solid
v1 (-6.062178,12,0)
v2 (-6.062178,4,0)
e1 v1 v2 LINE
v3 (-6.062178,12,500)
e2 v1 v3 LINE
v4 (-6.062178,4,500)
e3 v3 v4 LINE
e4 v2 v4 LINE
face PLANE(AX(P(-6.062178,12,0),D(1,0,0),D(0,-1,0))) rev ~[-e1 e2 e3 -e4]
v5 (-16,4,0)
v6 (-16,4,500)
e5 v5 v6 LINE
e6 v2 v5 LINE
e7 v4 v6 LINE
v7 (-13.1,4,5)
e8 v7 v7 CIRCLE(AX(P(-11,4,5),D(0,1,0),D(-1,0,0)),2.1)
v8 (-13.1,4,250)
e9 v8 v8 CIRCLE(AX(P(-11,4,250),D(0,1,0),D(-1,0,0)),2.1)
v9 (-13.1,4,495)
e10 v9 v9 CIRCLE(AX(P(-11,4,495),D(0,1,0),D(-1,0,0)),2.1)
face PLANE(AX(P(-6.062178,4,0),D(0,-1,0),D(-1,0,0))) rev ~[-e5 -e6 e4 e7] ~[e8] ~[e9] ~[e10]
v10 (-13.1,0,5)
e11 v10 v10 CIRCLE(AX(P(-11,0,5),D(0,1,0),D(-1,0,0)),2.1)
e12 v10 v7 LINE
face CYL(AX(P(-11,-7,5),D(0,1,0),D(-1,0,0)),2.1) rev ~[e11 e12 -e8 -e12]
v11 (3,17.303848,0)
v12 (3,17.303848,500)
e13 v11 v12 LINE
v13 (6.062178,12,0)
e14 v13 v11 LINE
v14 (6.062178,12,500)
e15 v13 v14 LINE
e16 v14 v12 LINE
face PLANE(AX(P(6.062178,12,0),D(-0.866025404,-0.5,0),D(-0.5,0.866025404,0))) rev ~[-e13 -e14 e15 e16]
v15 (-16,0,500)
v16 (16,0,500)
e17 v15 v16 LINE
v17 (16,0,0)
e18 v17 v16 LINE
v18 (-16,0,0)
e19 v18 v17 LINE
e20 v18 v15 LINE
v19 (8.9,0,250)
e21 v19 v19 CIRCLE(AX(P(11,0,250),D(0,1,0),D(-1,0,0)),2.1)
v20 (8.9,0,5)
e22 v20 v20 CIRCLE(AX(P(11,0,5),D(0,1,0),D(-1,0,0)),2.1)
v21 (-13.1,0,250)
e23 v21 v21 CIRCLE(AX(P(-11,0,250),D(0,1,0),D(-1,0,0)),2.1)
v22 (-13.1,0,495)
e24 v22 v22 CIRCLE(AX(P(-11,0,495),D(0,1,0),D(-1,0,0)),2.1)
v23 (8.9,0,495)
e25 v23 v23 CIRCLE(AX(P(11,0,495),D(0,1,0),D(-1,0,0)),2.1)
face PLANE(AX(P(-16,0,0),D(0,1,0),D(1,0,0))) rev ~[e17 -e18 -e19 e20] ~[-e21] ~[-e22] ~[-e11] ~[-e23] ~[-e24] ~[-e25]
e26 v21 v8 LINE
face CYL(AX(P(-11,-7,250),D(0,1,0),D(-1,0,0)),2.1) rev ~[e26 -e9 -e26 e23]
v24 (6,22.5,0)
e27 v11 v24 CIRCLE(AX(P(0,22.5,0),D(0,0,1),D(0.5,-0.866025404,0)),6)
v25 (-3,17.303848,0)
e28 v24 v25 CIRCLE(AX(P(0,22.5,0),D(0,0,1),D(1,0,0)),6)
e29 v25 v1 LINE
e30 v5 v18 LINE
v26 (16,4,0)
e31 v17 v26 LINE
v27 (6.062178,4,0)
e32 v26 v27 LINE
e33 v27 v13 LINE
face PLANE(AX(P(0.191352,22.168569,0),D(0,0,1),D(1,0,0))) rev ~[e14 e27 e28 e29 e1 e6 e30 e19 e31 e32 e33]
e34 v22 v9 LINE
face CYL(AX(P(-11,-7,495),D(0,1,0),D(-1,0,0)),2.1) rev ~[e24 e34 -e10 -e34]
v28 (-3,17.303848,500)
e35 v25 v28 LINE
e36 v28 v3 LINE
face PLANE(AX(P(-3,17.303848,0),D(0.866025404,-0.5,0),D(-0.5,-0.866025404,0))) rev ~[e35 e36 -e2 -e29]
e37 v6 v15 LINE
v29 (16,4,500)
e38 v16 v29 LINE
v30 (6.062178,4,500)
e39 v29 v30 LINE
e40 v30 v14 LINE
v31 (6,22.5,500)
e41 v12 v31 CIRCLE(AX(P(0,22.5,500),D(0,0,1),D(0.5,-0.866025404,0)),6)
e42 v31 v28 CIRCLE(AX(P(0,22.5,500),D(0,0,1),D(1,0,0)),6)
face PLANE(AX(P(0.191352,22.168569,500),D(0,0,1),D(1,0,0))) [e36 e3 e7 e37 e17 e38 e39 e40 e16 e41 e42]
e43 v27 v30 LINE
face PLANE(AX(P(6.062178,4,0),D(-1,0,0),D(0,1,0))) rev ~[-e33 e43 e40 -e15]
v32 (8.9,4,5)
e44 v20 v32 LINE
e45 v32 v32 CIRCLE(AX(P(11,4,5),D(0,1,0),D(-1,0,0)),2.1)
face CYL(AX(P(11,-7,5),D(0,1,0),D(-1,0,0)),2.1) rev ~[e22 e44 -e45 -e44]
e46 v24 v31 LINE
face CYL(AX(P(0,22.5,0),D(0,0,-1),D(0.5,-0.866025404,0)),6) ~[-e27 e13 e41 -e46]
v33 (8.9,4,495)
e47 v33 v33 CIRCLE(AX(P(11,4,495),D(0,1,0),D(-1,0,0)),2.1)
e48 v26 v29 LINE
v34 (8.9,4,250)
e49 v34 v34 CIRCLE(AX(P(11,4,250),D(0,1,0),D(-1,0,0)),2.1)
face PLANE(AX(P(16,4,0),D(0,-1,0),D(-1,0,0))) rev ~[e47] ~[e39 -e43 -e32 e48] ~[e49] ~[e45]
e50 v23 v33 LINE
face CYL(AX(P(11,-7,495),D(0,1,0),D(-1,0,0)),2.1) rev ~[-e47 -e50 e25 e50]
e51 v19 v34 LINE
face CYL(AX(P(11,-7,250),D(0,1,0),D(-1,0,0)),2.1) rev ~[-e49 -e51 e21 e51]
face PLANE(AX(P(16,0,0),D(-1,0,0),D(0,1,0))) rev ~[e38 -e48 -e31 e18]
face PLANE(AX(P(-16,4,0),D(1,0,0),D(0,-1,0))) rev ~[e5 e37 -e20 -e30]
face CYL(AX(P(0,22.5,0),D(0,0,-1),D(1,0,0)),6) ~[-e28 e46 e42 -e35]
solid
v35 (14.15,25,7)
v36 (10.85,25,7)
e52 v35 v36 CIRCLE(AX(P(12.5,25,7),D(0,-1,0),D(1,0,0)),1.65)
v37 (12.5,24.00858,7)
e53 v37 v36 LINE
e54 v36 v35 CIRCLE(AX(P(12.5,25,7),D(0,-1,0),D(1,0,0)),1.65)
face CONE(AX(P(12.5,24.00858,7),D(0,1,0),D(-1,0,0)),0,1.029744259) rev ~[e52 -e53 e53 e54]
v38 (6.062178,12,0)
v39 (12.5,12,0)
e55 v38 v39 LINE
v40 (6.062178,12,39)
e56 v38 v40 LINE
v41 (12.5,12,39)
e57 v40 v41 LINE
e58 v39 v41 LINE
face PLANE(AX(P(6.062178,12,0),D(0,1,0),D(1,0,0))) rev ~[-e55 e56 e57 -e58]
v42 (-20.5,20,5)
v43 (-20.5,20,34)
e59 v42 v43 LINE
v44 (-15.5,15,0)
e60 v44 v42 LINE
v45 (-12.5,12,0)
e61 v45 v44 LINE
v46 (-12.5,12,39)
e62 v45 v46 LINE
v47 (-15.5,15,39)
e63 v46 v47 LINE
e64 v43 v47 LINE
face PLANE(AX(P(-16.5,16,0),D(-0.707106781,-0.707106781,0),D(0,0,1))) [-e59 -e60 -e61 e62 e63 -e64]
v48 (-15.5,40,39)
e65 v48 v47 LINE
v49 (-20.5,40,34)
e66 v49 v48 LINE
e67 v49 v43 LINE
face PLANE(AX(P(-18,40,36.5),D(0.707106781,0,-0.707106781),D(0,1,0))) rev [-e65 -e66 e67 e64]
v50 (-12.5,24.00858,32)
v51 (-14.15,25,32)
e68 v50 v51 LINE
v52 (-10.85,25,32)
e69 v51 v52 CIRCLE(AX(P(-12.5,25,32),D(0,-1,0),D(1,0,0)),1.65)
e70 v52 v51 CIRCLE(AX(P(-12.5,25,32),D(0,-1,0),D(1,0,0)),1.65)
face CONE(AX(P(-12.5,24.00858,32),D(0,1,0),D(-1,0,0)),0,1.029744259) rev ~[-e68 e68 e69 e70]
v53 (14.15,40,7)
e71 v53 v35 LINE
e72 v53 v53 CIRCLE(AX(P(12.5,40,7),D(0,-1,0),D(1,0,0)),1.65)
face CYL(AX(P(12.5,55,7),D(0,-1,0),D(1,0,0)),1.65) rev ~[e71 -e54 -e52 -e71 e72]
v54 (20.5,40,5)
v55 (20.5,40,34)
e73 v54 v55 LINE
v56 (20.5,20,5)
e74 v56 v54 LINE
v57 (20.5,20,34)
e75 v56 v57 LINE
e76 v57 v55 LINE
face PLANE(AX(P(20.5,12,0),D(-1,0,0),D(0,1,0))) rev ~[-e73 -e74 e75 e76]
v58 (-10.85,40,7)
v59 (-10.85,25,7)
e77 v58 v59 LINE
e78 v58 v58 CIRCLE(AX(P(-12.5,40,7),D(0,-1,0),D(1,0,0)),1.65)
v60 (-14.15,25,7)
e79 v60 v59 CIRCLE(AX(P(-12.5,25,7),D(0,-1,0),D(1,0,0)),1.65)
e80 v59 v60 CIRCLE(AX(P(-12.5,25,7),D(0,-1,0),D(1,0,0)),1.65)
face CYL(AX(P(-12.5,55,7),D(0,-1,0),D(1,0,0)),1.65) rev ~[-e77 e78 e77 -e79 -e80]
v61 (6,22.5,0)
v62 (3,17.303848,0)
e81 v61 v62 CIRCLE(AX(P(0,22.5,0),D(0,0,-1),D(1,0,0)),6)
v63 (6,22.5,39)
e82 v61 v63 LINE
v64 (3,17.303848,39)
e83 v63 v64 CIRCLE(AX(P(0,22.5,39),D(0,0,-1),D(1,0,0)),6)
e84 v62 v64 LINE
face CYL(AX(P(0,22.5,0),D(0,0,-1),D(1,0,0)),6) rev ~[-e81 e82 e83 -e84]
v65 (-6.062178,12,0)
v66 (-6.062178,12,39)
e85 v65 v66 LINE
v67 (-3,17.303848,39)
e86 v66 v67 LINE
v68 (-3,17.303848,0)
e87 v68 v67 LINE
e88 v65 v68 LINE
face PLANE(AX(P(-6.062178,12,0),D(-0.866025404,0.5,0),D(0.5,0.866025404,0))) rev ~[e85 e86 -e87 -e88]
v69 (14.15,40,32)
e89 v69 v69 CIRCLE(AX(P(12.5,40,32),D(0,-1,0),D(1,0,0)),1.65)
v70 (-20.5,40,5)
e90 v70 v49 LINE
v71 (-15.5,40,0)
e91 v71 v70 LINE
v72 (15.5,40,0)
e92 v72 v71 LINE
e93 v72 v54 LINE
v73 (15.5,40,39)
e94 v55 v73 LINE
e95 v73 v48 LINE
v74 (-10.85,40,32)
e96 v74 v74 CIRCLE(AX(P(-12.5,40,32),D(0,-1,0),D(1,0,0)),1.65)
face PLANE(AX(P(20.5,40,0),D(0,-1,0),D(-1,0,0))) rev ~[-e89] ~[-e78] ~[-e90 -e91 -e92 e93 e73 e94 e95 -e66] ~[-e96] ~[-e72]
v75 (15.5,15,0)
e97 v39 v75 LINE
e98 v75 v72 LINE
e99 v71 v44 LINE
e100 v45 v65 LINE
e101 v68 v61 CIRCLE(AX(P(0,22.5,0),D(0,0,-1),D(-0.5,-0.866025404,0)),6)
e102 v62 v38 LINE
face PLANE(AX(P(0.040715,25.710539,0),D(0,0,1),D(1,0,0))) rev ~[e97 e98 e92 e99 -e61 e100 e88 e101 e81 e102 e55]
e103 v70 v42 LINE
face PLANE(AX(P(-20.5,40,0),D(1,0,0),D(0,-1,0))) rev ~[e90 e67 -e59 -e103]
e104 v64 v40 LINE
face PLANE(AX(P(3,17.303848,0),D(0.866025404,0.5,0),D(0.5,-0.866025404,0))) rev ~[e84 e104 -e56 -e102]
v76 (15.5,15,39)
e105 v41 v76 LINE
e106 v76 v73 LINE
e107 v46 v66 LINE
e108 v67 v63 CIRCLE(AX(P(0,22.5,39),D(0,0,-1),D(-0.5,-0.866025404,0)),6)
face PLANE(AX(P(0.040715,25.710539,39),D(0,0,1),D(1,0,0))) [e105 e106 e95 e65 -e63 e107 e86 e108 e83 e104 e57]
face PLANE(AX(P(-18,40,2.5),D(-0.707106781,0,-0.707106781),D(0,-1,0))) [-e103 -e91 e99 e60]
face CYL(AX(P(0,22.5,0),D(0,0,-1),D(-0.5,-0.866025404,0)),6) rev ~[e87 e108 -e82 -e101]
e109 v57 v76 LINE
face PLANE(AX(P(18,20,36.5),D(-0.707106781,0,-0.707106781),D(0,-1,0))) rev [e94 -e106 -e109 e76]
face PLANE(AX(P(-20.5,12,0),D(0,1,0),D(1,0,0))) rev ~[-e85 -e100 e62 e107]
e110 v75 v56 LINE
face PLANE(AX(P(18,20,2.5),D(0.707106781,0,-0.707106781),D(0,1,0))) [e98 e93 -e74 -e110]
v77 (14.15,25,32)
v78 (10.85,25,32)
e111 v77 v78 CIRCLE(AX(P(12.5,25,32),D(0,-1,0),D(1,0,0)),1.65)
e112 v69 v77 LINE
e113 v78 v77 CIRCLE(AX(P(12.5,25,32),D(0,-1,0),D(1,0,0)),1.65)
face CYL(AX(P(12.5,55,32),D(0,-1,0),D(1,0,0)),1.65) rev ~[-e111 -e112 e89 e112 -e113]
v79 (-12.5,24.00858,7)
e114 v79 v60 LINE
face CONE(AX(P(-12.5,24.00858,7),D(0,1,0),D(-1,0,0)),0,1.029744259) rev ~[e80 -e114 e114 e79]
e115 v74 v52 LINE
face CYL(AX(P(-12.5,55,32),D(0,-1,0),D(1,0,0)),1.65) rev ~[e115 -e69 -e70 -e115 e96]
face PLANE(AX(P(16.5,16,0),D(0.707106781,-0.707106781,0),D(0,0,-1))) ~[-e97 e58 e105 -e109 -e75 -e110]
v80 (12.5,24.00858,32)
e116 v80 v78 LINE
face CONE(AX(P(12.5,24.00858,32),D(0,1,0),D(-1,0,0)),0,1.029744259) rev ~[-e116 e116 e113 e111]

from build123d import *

# Parameters (mm, degrees)
F1_DEPTH = 500
F2_DEPTH = 39
F4_D     = 3.3
F4_DEPTH = 15
F4_TIP   = 0.9914200214
F5_SIZE  = 8
F6_SIZE  = 5
F8_D     = 4.2
F8_DEPTH = 7
F8_TIP   = 1.2618073


with BuildPart() as f1:
    # F0 (on Top) → F1 (new body)
    with BuildSketch(Plane.XY):
        with BuildLine():
            ThreePointArc((3, 17.3038475773), (5.1961524227, 19.5), (6, 22.5))
            ThreePointArc((6, 22.5), (-3, 27.6961524227), (-3, 17.3038475773))
            ThreePointArc((-3, 17.3038475773), (0, 16.5), (3, 17.3038475773))
        make_face()
        with BuildLine():
            ThreePointArc((3, 17.3038475773), (0, 16.5), (-3, 17.3038475773))
            Line((-3, 17.3038475773), (-6.0621778265, 12))
            Line((-6.0621778265, 12), (-6.0621778265, 4))
            Line((-6.0621778265, 4), (6.0621778265, 4))
            Line((6.0621778265, 4), (6.0621778265, 12))
            Line((6.0621778265, 12), (3, 17.3038475773))
        make_face()
        Polygon((6.0621778265, 4), (-6.0621778265, 4), (-16, 4), (-16, 0), (16, 0), (16, 4), align=None)
    extrude(amount=F1_DEPTH)

    # F8
    with Locations(Plane.XZ):
        with Locations((11, 5), (-11, 5), (11, 250), (-11, 250), (11, 495), (-11, 495)):
            Hole(F8_D / 2, depth=F8_DEPTH)
            with Locations((0, 0, -(F8_DEPTH + F8_TIP / 2))):  # 118° drill point
                Cone(0, F8_D / 2, F8_TIP, mode=Mode.SUBTRACT)


with BuildPart() as f2:
    # F0 (on Top) → F2 (new body)
    with BuildSketch(Plane.XY):
        with BuildLine():
            ThreePointArc((-3, 17.3038475773), (-3, 27.6961524227), (6, 22.5))
            ThreePointArc((6, 22.5), (5.1961524227, 19.5), (3, 17.3038475773))
            Line((3, 17.3038475773), (6.0621778265, 12))
            Line((6.0621778265, 12), (20.5, 12))
            Line((20.5, 12), (20.5, 40))
            Line((20.5, 40), (-20.5, 40))
            Line((-20.5, 40), (-20.5, 12))
            Line((-20.5, 12), (-6.0621778265, 12))
            Line((-6.0621778265, 12), (-3, 17.3038475773))
        make_face()
    extrude(amount=F2_DEPTH)

    # F4
    with Locations(Plane(origin=(0, 40, 0), x_dir=(-1, 0, 0), z_dir=(0, 1, 0))):
        with Locations((-12.5, 32), (-12.5, 7), (12.5, 7), (12.5, 32)):
            Hole(F4_D / 2, depth=F4_DEPTH)
            with Locations((0, 0, -(F4_DEPTH + F4_TIP / 2))):  # 118° drill point
                Cone(0, F4_D / 2, F4_TIP, mode=Mode.SUBTRACT)

    # F5
    f5_edges = [f2.edges().sort_by_distance(p)[0] for p in [
        (20.5, 12, 19.5),
        (-20.5, 12, 19.5),
    ]]
    chamfer(f5_edges, length=F5_SIZE)

    # F6
    f6_edges = [f2.edges().sort_by_distance(p)[0] for p in [
        (20.5, 30, 39),
        (20.5, 30, 0),
        (-20.5, 30, 0),
        (-20.5, 30, 39),
    ]]
    chamfer(f6_edges, length=F6_SIZE)


solid = Compound([f1.part, f2.part])
